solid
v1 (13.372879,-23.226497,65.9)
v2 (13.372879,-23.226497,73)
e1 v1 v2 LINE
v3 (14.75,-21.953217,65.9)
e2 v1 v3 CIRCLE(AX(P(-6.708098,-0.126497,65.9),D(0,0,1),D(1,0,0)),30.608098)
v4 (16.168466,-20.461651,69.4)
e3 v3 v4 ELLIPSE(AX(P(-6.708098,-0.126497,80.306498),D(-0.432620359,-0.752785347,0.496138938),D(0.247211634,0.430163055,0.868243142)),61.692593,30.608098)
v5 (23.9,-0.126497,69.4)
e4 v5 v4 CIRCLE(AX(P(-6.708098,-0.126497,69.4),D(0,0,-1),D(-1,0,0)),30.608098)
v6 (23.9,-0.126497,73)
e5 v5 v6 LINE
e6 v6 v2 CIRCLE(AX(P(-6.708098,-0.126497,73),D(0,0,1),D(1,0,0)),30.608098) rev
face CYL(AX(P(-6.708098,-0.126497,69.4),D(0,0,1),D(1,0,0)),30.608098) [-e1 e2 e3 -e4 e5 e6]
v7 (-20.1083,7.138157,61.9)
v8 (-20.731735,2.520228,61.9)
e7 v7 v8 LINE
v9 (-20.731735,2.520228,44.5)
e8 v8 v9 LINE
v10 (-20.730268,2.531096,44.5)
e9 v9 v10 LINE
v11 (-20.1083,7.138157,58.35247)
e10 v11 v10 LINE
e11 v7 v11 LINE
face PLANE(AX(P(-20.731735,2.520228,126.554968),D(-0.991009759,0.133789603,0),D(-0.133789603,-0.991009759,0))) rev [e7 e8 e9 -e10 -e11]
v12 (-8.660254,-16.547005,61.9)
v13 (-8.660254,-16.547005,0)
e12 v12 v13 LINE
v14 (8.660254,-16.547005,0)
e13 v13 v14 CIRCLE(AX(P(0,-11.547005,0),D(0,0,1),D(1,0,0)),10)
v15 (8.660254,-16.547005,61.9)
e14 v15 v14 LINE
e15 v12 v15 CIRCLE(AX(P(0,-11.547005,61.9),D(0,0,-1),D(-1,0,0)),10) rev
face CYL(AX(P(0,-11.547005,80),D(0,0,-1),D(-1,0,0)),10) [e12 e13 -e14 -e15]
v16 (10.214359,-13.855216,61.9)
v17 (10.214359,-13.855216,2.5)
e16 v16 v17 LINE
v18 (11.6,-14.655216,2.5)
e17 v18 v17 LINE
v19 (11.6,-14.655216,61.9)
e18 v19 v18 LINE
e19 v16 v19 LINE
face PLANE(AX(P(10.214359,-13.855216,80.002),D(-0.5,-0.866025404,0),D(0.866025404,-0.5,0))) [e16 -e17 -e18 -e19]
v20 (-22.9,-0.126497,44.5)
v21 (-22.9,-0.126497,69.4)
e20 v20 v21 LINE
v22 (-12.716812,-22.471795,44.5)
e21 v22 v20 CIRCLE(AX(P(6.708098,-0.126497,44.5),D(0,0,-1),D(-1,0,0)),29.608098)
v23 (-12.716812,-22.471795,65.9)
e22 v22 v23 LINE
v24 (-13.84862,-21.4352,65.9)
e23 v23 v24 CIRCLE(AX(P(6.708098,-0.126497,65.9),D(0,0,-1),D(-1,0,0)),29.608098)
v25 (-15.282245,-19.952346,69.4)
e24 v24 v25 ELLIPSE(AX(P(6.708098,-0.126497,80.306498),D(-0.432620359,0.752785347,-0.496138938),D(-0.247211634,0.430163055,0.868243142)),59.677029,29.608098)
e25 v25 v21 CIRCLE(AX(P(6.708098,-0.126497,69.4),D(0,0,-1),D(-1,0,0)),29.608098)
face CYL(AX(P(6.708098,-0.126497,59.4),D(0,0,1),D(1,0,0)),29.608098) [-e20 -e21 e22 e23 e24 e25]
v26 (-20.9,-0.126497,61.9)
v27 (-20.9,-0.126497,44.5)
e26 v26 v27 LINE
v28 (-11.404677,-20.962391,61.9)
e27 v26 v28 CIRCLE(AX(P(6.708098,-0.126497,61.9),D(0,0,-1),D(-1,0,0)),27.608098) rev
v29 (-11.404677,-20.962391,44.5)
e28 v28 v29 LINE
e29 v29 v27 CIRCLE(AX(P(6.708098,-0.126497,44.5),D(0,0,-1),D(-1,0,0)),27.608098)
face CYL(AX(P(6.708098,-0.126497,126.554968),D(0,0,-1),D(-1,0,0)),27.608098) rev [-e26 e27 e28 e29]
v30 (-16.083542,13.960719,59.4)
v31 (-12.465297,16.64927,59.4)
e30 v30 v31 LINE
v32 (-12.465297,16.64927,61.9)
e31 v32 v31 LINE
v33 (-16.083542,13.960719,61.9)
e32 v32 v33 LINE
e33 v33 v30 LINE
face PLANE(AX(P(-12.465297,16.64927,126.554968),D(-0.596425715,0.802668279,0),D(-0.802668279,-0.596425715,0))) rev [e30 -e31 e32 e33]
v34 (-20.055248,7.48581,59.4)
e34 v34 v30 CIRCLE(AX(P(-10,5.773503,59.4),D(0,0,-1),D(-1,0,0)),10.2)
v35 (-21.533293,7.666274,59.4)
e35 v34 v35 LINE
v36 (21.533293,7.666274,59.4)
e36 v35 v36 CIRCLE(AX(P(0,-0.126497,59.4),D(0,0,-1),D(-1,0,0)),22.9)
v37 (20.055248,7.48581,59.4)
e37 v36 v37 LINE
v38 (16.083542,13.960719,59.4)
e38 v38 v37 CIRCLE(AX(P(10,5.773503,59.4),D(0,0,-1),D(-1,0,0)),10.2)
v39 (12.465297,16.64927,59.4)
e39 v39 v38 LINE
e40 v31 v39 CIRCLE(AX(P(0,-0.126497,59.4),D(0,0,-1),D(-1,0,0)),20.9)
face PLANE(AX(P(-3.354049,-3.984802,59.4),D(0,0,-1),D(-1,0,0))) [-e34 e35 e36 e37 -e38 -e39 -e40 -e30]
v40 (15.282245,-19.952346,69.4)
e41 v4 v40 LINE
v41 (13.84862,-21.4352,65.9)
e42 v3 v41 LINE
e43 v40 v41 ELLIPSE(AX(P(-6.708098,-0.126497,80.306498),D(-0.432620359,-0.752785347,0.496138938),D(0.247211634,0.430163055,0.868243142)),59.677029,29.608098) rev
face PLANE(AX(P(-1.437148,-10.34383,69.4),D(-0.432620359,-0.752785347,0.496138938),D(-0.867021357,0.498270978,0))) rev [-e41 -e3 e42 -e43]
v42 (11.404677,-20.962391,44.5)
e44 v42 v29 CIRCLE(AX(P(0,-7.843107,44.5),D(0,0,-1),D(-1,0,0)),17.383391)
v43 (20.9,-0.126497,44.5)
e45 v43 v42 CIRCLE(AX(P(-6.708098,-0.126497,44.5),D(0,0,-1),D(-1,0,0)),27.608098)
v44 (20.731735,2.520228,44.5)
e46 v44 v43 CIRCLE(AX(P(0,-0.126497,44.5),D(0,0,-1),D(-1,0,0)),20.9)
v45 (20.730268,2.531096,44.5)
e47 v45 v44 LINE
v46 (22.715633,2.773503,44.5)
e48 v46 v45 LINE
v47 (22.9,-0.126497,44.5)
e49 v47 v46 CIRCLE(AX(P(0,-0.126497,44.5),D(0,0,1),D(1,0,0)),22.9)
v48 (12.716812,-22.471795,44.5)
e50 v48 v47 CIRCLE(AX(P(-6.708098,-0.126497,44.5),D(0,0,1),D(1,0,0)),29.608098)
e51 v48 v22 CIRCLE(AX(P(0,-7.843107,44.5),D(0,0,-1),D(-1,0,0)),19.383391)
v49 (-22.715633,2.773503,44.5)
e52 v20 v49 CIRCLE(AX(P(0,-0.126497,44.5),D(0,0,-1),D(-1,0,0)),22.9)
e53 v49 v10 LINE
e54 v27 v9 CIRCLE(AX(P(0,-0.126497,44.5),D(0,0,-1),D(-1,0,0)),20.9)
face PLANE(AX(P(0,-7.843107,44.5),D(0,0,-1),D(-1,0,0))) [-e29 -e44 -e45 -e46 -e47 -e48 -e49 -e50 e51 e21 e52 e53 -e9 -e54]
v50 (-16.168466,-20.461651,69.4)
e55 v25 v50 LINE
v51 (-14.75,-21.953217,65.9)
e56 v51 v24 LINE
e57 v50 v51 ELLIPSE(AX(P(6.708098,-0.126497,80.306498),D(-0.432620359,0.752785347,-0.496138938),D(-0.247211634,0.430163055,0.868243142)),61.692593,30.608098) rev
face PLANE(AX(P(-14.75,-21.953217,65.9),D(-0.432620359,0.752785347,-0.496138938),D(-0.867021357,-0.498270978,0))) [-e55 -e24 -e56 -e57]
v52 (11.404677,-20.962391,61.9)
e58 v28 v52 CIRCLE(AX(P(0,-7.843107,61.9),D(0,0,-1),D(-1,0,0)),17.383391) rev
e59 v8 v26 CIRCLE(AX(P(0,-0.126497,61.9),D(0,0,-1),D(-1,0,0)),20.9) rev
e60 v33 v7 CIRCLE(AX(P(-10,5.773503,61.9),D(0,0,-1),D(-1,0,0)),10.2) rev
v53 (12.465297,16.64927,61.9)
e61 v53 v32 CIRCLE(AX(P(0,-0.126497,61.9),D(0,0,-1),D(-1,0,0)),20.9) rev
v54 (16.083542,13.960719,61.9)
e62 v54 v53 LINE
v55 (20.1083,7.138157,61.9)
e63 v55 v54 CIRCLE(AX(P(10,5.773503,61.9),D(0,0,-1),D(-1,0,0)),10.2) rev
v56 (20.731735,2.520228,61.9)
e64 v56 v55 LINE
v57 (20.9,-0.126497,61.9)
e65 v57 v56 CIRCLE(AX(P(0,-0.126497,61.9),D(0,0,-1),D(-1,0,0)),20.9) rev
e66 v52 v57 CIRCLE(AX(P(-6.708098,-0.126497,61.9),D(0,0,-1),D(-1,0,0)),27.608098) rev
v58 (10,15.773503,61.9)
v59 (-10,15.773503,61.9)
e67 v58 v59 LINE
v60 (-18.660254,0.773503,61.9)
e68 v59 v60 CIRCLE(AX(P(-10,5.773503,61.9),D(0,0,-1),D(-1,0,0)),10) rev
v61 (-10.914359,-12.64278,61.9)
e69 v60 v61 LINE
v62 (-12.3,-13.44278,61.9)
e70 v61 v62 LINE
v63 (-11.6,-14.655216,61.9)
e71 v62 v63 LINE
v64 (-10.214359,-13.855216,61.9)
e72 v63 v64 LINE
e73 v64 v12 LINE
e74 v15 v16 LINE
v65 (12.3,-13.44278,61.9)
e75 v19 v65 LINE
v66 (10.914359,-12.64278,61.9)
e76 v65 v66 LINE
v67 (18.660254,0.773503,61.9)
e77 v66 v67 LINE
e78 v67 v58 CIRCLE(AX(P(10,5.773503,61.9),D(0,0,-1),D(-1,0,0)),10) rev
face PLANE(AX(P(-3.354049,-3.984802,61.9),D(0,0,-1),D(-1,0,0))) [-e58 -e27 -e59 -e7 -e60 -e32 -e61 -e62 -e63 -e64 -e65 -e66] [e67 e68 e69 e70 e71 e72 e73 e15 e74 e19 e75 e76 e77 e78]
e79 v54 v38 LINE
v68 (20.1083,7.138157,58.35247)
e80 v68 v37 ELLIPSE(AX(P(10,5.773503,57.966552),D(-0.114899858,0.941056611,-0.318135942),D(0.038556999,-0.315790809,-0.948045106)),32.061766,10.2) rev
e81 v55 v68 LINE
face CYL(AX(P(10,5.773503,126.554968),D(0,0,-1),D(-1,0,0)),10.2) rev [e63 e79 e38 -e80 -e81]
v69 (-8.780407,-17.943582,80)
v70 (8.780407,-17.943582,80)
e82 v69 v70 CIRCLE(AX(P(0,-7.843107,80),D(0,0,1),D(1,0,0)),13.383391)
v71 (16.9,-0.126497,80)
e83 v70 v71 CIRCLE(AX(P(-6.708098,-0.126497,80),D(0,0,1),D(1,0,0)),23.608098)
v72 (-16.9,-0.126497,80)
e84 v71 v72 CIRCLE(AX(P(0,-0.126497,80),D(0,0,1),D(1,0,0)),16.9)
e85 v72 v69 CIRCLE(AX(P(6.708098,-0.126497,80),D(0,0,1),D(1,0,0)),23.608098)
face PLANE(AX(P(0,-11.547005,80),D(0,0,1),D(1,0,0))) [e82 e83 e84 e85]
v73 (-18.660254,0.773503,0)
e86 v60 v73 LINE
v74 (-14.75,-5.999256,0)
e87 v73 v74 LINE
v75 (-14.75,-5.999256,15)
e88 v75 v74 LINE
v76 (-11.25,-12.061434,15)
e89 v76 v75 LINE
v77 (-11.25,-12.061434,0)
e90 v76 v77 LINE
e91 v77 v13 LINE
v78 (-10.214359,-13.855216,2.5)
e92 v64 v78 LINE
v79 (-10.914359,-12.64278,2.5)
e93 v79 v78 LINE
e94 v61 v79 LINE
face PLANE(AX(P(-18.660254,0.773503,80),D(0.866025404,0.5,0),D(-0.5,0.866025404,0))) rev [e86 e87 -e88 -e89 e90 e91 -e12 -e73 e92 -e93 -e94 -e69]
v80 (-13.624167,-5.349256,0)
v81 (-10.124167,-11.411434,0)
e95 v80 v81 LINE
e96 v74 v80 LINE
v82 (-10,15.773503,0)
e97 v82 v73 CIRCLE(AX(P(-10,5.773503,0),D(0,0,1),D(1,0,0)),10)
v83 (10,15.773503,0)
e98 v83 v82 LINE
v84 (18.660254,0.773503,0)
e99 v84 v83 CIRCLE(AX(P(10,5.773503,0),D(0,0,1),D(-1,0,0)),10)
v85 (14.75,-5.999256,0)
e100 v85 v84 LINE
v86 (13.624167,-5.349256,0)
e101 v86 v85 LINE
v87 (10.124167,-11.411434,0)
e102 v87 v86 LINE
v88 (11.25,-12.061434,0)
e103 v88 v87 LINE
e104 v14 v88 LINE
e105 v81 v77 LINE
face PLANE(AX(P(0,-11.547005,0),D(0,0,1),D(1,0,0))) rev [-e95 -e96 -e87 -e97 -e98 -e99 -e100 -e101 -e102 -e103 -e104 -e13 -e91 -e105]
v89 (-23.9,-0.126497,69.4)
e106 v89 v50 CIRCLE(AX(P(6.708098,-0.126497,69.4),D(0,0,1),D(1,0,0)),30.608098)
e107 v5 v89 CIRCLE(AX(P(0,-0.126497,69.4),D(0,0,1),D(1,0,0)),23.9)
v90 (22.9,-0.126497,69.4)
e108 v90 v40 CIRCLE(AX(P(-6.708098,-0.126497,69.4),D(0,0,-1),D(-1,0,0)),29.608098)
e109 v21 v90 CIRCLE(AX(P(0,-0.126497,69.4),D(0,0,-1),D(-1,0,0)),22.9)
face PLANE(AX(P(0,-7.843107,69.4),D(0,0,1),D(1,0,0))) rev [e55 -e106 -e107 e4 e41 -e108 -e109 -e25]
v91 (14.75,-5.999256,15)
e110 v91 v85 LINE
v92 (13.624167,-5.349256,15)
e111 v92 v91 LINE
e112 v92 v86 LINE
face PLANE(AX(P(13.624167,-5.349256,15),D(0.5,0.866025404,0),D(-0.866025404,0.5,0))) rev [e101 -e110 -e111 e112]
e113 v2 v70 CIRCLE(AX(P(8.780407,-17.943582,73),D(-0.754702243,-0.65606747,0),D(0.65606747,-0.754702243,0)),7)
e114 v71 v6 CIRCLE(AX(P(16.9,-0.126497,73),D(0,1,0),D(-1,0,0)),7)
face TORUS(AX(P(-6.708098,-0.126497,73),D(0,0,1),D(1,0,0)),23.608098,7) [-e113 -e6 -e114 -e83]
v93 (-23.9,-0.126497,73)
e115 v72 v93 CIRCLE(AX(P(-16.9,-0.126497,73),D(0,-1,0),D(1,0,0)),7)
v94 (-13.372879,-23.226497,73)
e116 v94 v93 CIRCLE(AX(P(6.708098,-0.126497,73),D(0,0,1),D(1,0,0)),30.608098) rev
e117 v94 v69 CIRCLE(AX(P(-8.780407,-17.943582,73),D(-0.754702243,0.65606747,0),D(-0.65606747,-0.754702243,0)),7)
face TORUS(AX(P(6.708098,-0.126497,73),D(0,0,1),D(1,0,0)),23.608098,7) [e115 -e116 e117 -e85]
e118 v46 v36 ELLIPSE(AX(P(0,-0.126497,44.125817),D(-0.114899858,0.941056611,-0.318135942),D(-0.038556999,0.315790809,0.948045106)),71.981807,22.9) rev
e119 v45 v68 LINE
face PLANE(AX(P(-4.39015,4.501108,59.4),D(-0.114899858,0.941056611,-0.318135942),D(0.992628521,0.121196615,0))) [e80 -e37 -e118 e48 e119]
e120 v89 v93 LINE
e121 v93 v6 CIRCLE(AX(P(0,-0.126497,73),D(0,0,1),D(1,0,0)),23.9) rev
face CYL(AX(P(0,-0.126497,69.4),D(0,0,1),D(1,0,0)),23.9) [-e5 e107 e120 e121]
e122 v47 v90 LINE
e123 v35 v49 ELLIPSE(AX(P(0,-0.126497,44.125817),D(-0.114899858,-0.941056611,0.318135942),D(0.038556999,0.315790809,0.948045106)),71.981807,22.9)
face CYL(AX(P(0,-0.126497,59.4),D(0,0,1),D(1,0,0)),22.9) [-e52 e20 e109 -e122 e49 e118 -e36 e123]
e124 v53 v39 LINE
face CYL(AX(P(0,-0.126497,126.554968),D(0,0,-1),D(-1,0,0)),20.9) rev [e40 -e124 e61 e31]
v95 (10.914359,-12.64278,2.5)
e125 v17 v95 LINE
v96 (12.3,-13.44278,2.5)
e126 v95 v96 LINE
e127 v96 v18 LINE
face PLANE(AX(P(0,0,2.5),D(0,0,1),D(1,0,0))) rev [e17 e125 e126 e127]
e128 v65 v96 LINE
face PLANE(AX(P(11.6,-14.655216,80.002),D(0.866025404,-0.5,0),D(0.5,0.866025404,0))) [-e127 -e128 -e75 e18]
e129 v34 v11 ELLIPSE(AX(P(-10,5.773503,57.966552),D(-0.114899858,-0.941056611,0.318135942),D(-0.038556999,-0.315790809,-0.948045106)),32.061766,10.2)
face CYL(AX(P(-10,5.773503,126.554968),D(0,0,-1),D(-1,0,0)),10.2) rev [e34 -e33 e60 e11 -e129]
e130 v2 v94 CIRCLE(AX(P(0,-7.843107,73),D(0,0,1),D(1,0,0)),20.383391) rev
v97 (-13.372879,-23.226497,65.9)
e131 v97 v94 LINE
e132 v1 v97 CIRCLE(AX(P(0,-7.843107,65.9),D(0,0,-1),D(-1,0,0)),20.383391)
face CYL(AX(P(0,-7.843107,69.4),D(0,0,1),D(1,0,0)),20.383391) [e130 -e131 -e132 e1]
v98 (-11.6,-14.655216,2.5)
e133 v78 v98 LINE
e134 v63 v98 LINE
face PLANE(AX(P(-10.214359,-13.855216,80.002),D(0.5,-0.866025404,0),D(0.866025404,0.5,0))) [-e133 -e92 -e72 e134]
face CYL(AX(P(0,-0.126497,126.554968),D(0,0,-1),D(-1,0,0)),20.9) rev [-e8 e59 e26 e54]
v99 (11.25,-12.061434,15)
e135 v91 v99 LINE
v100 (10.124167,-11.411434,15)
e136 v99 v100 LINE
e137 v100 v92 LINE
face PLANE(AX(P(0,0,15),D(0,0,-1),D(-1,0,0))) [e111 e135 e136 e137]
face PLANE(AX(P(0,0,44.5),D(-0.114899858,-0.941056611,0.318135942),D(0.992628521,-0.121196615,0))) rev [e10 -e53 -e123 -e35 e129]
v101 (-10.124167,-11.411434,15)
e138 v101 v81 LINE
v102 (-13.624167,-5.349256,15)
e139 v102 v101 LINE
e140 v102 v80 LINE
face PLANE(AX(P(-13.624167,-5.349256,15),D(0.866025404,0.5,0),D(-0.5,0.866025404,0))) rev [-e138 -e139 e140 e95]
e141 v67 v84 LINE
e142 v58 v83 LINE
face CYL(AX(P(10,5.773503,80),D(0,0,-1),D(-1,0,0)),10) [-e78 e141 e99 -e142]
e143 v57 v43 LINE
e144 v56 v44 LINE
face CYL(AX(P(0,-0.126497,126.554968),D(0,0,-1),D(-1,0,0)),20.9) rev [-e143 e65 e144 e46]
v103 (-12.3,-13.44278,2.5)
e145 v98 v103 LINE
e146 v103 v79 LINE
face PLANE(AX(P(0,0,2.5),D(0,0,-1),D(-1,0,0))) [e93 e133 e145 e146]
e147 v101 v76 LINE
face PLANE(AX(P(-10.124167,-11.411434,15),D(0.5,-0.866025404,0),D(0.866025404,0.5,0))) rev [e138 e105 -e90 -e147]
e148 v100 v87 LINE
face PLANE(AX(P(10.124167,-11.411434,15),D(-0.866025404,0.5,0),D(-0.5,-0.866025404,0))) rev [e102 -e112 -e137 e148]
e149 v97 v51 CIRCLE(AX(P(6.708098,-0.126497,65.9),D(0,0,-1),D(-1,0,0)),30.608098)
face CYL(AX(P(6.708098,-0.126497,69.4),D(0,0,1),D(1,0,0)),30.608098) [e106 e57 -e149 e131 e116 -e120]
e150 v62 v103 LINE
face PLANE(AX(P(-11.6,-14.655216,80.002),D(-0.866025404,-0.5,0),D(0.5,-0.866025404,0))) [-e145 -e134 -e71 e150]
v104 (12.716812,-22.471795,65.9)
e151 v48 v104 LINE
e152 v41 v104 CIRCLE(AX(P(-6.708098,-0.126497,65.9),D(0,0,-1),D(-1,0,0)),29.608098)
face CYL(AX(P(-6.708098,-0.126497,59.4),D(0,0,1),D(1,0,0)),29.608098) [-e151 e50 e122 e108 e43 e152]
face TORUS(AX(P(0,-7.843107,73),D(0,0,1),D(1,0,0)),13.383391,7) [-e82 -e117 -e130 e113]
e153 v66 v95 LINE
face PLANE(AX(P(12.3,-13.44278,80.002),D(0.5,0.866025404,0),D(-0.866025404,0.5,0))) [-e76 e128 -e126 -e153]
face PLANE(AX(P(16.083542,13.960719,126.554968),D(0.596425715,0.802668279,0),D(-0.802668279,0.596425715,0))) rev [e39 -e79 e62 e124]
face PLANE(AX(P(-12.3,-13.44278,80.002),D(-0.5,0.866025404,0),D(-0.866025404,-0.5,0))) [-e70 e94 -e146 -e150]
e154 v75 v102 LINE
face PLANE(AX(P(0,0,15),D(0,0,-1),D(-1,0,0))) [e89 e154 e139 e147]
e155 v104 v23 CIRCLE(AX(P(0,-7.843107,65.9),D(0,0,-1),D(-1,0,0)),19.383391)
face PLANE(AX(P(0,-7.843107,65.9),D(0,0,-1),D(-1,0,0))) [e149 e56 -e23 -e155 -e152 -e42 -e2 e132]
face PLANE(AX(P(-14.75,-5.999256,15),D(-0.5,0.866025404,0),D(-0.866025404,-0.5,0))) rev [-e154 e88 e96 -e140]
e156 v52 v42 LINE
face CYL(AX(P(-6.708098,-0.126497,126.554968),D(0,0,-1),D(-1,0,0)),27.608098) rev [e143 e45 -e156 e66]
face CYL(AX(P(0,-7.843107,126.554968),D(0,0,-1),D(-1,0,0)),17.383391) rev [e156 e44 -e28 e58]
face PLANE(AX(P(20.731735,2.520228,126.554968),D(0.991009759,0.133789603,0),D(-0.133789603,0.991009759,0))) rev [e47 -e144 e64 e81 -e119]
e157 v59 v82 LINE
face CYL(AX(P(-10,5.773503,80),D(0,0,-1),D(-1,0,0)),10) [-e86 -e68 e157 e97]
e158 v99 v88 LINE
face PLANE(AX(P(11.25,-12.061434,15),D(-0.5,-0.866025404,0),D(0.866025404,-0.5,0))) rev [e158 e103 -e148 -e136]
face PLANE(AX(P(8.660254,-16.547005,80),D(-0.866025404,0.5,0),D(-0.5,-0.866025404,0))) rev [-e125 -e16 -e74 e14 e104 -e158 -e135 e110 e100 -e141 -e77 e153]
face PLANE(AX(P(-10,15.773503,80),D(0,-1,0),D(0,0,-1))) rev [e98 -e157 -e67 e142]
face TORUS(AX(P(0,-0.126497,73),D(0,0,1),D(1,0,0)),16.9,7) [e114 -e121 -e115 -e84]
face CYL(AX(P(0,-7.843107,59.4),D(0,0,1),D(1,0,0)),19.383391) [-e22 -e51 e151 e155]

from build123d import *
from OCP.BRepFilletAPI import BRepFilletAPI_MakeChamfer

# Parameters (mm, degrees)
BOSS_EXTRU_1_DEPTH      = 80
BOSS_EXTRU_2_DEPTH      = 10.6
BOSS_EXTRU_3_DEPTH      = 10
BOSS_EXTRU_4_DEPTH      = 3.5
CHANFREIN1_SIZE         = 2
CHANFREIN1_SIZE_2       = 3.5
BOSS_EXTRU_5_DEPTH      = 14.9
CHANFREIN2_SIZE         = 5
CHANFREIN2_SIZE_2       = 14.9
ENL_V_MAT_EXTRU_1_DEPTH = 61.9
BOSS_EXTRU_8_REACH      = 92.636
BOSS_EXTRU_8_START      = -2.5
ENL_V_MAT_EXTRU_4_DEPTH = 15
CONG_1_R                = 7


with BuildPart() as part:
    # Esquisse1 → Boss.-Extru.1 (new body)
    with BuildSketch(Plane.XY):
        with BuildLine():
            Line((-9.999999999999973, 15.773502691896244), (9.999999999999973, 15.773502691896244))
            ThreePointArc((9.999999999999973, 15.773502691896244), (18.66025403784436, 10.773502691896228), (18.66025403784438, 0.7735026918962024))
            Line((18.66025403784438, 0.7735026918962024), (8.660254037844393, -16.54700538379251))
            ThreePointArc((8.660254037844393, -16.54700538379251), (-4.87e-15, -21.5470053837925), (-8.660254037844393, -16.54700538379251))
            Line((-8.660254037844393, -16.54700538379251), (-18.66025403784438, 0.7735026918962024))
            ThreePointArc((-18.66025403784438, 0.7735026918962024), (-18.66025403784441, 10.773502691896235), (-9.999999999999973, 15.773502691896244))
        make_face()
    extrude(amount=BOSS_EXTRU_1_DEPTH)

    # Esquisse2 → Boss.-Extru.2 (add)
    with BuildSketch(Plane.XY.offset(80)):
        with BuildLine():
            Line((0, 23.773502691896258), (0, -28.226497308103742))
            ThreePointArc((0, -28.226497308103742), (-7.138520611844601, -26.935621886911633), (-13.372879499304581, -23.22649730810374))
            ThreePointArc((-13.372879499304581, -23.22649730810374), (-21.14415675858487, -12.819312855059437), (-23.89999999999999, -0.12649730810374363))
            ThreePointArc((-23.89999999999999, -0.12649730810374363), (-16.89985207035848, 16.773354762254744), (0, 23.773502691896258))
        make_face()
    boss_extru_2 = extrude(amount=-BOSS_EXTRU_2_DEPTH)

    # Symétrie1: Boss.-Extru.2 across plane
    add(boss_extru_2.mirror(Plane(origin=(0, 0, 0), x_dir=(0, 0, 1), z_dir=(1, 0, 0))))

    # Esquisse4 → Boss.-Extru.3 (add)
    with BuildSketch(Plane(origin=(0, 0, 69.4), x_dir=(-1, 0, 0), z_dir=(0, 0, -1))):
        with BuildLine():
            ThreePointArc((-12.716812029717252, -22.471795065262707), (-2.04e-15, -27.226497308103735), (12.71681202971725, -22.4717950652627))
            ThreePointArc((12.71681202971725, -22.4717950652627), (20.2341931687673, -12.404624700892555), (22.899999999999995, -0.12649730810373652))
            ThreePointArc((22.899999999999995, -0.12649730810373652), (-6.91e-15, 22.773502691896258), (-22.899999999999995, -0.12649730810373735))
            ThreePointArc((-22.899999999999995, -0.12649730810373735), (-20.234193168767305, -12.404624700892553), (-12.716812029717252, -22.471795065262707))
        make_face()
    extrude(amount=BOSS_EXTRU_3_DEPTH)

    # Esquisse6 → Boss.-Extru.4 (add)
    with BuildSketch(Plane(origin=(0, 0, 69.4), x_dir=(-1, 0, 0), z_dir=(0, 0, -1))):
        with BuildLine():
            Line((14.75, -21.95321690393977), (0, -13.476497308103742))
            Line((0, -13.476497308103742), (0, -28.226497308103742))
            ThreePointArc((0, -28.226497308103742), (7.138520611844594, -26.935621886911633), (13.372879499304576, -23.226497308103735))
            ThreePointArc((13.372879499304576, -23.226497308103735), (14.071194795630928, -22.600407707254973), (14.75, -21.95321690393977))
        make_face()
    boss_extru_4 = extrude(amount=BOSS_EXTRU_4_DEPTH)

    # Symétrie2: Boss.-Extru.4 across plane
    add(boss_extru_4.mirror(Plane(origin=(0, 0, 0), x_dir=(0, 0, 1), z_dir=(1, 0, 0))))

    # Chanfrein1
    chanfrein1_edges_1 = [part.edges().sort_by_distance(p)[0] for p in [
        (-14.299309891443901, -21.69420851920438, 69.4),
    ]]
    chanfrein1_side_1 = [part.faces().sort_by_distance(p)[0] for p in [
        (-14.319240730556658, -21.659527664943543, 69.4),
    ]]
    chanfrein1_edges_2 = [part.edges().sort_by_distance(p)[0] for p in [
        (14.299309891443906, -21.694208519204384, 69.4),
    ]]
    chanfrein1_side_2 = [part.faces().sort_by_distance(p)[0] for p in [
        (14.319240730556663, -21.659527664943546, 69.4),
    ]]
    chanfrein1 = BRepFilletAPI_MakeChamfer(part.part.solid().wrapped)
    for e in chanfrein1_edges_1:
        chanfrein1.Add(CHANFREIN1_SIZE - 0.0001, CHANFREIN1_SIZE_2 - 0.0001, e.wrapped, chanfrein1_side_1[0].wrapped)
    for e in chanfrein1_edges_2:
        chanfrein1.Add(CHANFREIN1_SIZE - 0.0001, CHANFREIN1_SIZE_2 - 0.0001, e.wrapped, chanfrein1_side_2[0].wrapped)
    add(Compound.cast(chanfrein1.Shape()), mode=Mode.REPLACE)  # a hair under: the kernel refuses the full size

    # Esquisse7 → Boss.-Extru.5 (add)
    with BuildSketch(Plane(origin=(0, 0, 59.4), x_dir=(-1, 0, 0), z_dir=(0, 0, -1))):
        with BuildLine():
            Line((-6.79e-15, -27.22649730810374), (0, 0))
            Line((0, 0), (22.71563338320109, 2.7735026918962267))
            ThreePointArc((22.71563338320109, 2.7735026918962267), (22.853861867037974, 1.3264299999015228), (22.899999999999995, -0.12649730810374016))
            ThreePointArc((22.899999999999995, -0.12649730810374016), (20.2341931687673, -12.404624700892562), (12.716812029717245, -22.471795065262707))
            ThreePointArc((12.716812029717245, -22.471795065262707), (6.788307992740876, -25.998951656029643), (-6.79e-15, -27.22649730810374))
        make_face()
    boss_extru_5 = extrude(amount=BOSS_EXTRU_5_DEPTH)

    # Symétrie4: Boss.-Extru.5 across plane
    add(boss_extru_5.mirror(Plane(origin=(0, 0, 0), x_dir=(0, 0, 1), z_dir=(1, 0, 0))))

    # Chanfrein2
    chanfrein2_edges_1 = [part.edges().sort_by_distance(p)[0] for p in [
        (21.059128460282075, 2.5712489935136453, 59.4),
    ]]
    chanfrein2_side_1 = [part.faces().sort_by_distance(p)[0] for p in [
        (21.04700879877706, 2.6705118456034573, 59.4),
    ]]
    chanfrein2_edges_2 = [part.edges().sort_by_distance(p)[0] for p in [
        (-21.059128460282082, 2.571248993513646, 59.4),
    ]]
    chanfrein2_side_2 = [part.faces().sort_by_distance(p)[0] for p in [
        (-21.059128460282082, 2.571248993513646, 59.3),
    ]]
    chanfrein2 = BRepFilletAPI_MakeChamfer(part.part.solid().wrapped)
    for e in chanfrein2_edges_1:
        chanfrein2.Add(CHANFREIN2_SIZE - 0.0001, CHANFREIN2_SIZE_2 - 0.0001, e.wrapped, chanfrein2_side_1[0].wrapped)
    for e in chanfrein2_edges_2:
        chanfrein2.Add(CHANFREIN2_SIZE_2 - 0.0001, CHANFREIN2_SIZE - 0.0001, e.wrapped, chanfrein2_side_2[0].wrapped)
    add(Compound.cast(chanfrein2.Shape()), mode=Mode.REPLACE)  # a hair under: the kernel refuses the full size

    # Esquisse8 → Enlèv. mat.-Extru.1 (cut)
    with BuildSketch(Plane(origin=(0, 0, 0), x_dir=(-1, 0, 0), z_dir=(0, 0, -1))):
        with BuildLine():
            Line((-20.73173527113113, 2.5202275827259273), (-20.108299540895768, 7.138156637600371))
            ThreePointArc((-20.108299540895768, 7.138156637600371), (-18.785258977060302, 10.95609130242486), (-16.08354229758742, 13.96071913666333))
            Line((-16.08354229758742, 13.96071913666333), (-12.465297452899778, 16.64926972087978))
            ThreePointArc((-12.465297452899778, 16.64926972087978), (8.34e-15, 20.773502691896244), (12.465297452899788, 16.649269720879765))
            Line((12.465297452899788, 16.649269720879765), (16.083542297587456, 13.96071913666329))
            ThreePointArc((16.083542297587456, 13.96071913666329), (18.78525897706036, 10.956091302424788), (20.108299540895814, 7.13815663760026))
            Line((20.108299540895814, 7.13815663760026), (20.73173527113112, 2.5202275827259264))
            ThreePointArc((20.73173527113112, 2.5202275827259264), (20.857891398301028, 1.1995367852285772), (20.89999999999999, -0.12649730810373677))
            ThreePointArc((20.89999999999999, -0.12649730810373677), (18.414265989132176, -11.5752483925588), (11.404677090542576, -20.962390579580656))
            ThreePointArc((11.404677090542576, -20.962390579580656), (1.69e-15, -25.226497308103735), (-11.40467709054258, -20.962390579580664))
            ThreePointArc((-11.40467709054258, -20.962390579580664), (-18.414265989132176, -11.575248392558798), (-20.89999999999999, -0.1264973081037376))
            ThreePointArc((-20.89999999999999, -0.1264973081037376), (-20.85789139830103, 1.1995367852285768), (-20.73173527113113, 2.5202275827259273))
        make_face()
        with BuildLine():
            Line((-18.66025403784436, 0.773502691896218), (-8.660254037844393, -16.54700538379251))
            ThreePointArc((-8.660254037844393, -16.54700538379251), (6.09e-15, -21.547005383792524), (8.660254037844393, -16.54700538379251))
            Line((8.660254037844393, -16.54700538379251), (18.66025403784438, 0.7735026918962024))
            ThreePointArc((18.66025403784438, 0.7735026918962024), (18.66025403784438, 10.773502691896217), (9.999999999999973, 15.773502691896226))
            Line((9.999999999999973, 15.773502691896226), (-9.999999999999973, 15.773502691896244))
            ThreePointArc((-9.999999999999973, 15.773502691896244), (-18.660254037844357, 10.77350269189623), (-18.66025403784436, 0.773502691896218))
        make_face(mode=Mode.SUBTRACT)
    extrude(amount=-ENL_V_MAT_EXTRU_1_DEPTH, mode=Mode.SUBTRACT)

    # Esquisse9 → Boss.-Extru.8 (add, up to next)
    with BuildSketch(Plane(origin=(0, 0, 0), x_dir=(-1, 0, 0), z_dir=(0, 0, -1)).offset(BOSS_EXTRU_8_START), mode=Mode.PRIVATE) as boss_extru_8_sk1:
        Polygon((-10.214359353944898, -13.855216015993522), (-11.599999999999998, -14.655216015993522), (-12.3, -13.442780450695311), (-10.914359353944906, -12.642780450695314), align=None)
    boss_extru_8_tool1 = extrude(boss_extru_8_sk1.sketch, amount=-BOSS_EXTRU_8_REACH, mode=Mode.PRIVATE) - part.part
    # Esquisse9 → Boss.-Extru.8 (add, up to next)
    with BuildSketch(Plane(origin=(0, 0, 0), x_dir=(-1, 0, 0), z_dir=(0, 0, -1)).offset(BOSS_EXTRU_8_START), mode=Mode.PRIVATE) as boss_extru_8_sk2:
        Polygon((10.914359353944906, -12.642780450695314), (10.214359353944898, -13.855216015993522), (11.599999999999998, -14.655216015993522), (12.3, -13.442780450695311), align=None)
    boss_extru_8_tool2 = extrude(boss_extru_8_sk2.sketch, amount=-BOSS_EXTRU_8_REACH, mode=Mode.PRIVATE) - part.part
    add(boss_extru_8_tool1.solids().sort_by_distance((11.25718, -13.648998, 2.5))[0])
    add(boss_extru_8_tool2.solids().sort_by_distance((-11.25718, -13.648998, 2.5))[0])

    # Esquisse10 → Enlèv. mat.-Extru.4 (cut)
    with BuildSketch(Plane(origin=(0, 0, 0), x_dir=(-1, 0, 0), z_dir=(0, 0, -1))):
        Polygon((-11.249999999999988, -12.061433798642668), (-10.124166975080218, -11.411433798642664), (-13.624166975080218, -5.349255972151593), (-14.74999999999999, -5.999255972151601), align=None)
        Polygon((11.250000000000012, -12.061433798642668), (14.750000000000009, -5.9992559721515955), (13.624166975080241, -5.349255972151597), (10.124166975080241, -11.411433798642667), align=None)
    extrude(amount=-ENL_V_MAT_EXTRU_4_DEPTH, mode=Mode.SUBTRACT)

    # Congé1
    cong_1_edges = [part.edges().sort_by_distance(p)[0] for p in [
        (-1.79e-15, 23.773502691896258, 80),
        (-21.144156758584863, -12.819312855059447, 80),
        (6.22e-15, -28.226497308103745, 80),
        (21.144156758584863, -12.819312855059447, 80),
    ]]
    fillet(cong_1_edges, radius=CONG_1_R)


solid = part.part
